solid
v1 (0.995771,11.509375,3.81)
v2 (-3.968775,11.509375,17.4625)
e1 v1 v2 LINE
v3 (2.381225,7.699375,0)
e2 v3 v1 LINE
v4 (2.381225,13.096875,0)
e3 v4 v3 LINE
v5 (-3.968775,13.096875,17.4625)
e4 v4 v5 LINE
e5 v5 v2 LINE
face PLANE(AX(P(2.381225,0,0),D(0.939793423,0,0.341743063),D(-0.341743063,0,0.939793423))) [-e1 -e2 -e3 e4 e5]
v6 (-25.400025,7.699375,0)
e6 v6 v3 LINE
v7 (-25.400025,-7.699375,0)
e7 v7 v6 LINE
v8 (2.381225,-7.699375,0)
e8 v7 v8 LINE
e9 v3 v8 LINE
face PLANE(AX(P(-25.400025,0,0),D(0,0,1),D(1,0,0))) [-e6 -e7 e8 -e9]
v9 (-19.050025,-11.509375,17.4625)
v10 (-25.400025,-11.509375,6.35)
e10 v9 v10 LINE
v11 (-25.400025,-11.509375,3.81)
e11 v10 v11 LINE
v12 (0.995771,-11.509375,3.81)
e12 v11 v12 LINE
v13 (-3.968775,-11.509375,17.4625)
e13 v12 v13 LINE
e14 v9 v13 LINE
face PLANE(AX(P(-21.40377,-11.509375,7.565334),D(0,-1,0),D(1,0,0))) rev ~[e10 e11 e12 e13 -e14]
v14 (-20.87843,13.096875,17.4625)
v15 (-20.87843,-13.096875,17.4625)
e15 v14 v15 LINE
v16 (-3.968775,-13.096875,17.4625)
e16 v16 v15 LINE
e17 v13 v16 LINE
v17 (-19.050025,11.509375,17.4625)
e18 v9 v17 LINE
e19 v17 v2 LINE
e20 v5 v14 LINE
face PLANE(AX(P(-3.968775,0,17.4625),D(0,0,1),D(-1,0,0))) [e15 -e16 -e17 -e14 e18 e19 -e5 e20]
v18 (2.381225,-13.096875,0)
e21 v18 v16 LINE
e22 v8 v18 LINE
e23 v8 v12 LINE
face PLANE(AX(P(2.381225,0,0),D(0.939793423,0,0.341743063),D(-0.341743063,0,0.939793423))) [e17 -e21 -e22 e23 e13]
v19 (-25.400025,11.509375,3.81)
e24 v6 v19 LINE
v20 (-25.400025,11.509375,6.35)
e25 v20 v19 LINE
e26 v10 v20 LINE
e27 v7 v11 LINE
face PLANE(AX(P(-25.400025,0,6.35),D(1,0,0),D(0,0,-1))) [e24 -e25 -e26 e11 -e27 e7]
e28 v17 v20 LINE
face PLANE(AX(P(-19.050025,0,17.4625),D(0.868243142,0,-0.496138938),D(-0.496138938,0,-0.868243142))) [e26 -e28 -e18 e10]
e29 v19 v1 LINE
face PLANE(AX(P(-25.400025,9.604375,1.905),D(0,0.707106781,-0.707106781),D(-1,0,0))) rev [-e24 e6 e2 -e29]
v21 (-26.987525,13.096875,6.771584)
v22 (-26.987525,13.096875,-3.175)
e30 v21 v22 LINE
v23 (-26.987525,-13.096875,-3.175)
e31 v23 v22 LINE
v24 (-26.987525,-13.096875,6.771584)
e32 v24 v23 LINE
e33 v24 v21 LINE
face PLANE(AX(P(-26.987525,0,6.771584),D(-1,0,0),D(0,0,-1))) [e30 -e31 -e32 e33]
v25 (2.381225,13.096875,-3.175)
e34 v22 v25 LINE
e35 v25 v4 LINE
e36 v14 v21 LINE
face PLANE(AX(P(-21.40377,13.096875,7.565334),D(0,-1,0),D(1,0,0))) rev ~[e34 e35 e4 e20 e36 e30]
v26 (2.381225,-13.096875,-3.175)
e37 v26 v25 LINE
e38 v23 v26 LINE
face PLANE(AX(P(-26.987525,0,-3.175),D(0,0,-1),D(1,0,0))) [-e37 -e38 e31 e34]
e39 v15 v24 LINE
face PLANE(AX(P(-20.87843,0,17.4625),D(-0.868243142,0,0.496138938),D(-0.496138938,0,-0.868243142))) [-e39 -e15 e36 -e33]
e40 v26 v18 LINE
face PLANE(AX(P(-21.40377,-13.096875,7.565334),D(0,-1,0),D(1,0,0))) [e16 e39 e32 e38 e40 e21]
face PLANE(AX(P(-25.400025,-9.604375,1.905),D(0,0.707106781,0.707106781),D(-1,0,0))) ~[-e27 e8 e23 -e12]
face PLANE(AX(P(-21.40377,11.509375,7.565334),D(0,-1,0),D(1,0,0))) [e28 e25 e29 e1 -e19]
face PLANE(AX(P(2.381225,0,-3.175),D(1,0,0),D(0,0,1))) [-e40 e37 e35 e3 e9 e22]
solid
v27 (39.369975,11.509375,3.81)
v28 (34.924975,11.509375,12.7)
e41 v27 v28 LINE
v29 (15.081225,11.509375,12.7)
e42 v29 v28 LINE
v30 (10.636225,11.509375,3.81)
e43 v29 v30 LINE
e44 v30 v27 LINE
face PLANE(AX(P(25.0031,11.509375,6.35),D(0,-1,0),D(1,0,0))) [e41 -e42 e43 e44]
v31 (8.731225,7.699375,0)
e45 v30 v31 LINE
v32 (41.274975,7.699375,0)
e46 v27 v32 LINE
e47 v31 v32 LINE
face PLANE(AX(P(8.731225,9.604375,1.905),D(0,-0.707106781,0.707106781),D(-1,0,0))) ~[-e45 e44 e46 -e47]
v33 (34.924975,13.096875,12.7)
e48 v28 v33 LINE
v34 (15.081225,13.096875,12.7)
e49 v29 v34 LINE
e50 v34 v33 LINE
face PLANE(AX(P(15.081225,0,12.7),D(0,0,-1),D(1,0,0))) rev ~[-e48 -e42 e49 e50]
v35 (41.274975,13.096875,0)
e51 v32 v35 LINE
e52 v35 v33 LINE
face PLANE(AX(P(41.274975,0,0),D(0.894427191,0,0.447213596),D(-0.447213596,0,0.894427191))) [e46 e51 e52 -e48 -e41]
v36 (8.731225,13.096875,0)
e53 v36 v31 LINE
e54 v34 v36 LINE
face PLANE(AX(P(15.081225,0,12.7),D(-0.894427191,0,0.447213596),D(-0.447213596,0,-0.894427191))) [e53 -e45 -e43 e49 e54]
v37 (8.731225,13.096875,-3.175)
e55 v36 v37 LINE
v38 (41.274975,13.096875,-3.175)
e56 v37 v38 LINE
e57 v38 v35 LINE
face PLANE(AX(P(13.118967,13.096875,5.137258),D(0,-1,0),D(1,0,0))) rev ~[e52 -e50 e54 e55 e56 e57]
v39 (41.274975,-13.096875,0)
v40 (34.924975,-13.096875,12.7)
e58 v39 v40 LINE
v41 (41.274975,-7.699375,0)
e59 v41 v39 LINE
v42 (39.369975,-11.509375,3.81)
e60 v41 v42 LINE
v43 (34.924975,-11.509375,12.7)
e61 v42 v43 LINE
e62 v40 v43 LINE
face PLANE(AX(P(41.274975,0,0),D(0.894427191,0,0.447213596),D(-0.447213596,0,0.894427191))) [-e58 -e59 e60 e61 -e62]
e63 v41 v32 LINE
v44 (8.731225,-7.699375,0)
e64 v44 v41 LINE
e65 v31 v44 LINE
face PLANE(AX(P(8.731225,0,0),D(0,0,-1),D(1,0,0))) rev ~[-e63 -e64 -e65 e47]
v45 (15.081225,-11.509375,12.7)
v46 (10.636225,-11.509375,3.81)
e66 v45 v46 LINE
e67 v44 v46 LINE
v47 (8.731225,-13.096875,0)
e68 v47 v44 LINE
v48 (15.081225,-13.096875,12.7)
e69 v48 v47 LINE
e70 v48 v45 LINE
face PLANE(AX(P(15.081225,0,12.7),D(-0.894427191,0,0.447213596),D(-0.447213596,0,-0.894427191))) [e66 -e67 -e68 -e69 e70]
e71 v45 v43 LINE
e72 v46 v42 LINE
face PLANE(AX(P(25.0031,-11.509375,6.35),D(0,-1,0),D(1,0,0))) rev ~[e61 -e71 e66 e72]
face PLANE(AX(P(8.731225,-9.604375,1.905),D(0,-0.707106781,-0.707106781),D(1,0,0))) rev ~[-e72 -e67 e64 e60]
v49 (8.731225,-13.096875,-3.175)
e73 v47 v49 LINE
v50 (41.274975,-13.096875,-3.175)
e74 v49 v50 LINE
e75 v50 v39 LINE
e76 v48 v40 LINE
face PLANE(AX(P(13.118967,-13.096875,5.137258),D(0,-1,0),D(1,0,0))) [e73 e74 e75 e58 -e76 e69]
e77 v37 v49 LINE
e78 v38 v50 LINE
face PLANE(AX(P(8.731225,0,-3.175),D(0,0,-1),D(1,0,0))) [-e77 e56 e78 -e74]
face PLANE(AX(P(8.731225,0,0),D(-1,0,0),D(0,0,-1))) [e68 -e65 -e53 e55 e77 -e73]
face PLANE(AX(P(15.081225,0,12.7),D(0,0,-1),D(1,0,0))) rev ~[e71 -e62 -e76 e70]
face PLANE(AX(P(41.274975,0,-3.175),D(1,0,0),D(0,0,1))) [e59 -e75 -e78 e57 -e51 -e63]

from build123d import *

# Parameters (mm, degrees)
F0_W      = 15.08125
F0_H      = 17.4625
F1_DEPTH  = 13.096875
F0_W_2    = 19.84375
F0_H_2    = 12.7
F2_DEPTH  = 11.509375
F3_SIZE   = 3.81
F3_2_SIZE = 3.81


# Not quite as in the source:
# - a feature names something its author has since deleted; it is built from what else it names


with BuildPart() as f1:
    # F0 (on Front) → F1 (new body, symmetric)
    with BuildSketch(Plane.XZ):
        Polygon((-25.4000246501, 0), (-19.0500246501, 0), (-19.0500246501, 17.4625), (-25.4000246501, 6.35), align=None)
        Polygon((-3.9687746501, 0), (2.3812253499, 0), (-3.9687746501, 17.4625), align=None)
        Polygon((-26.9875246501, -3.175), (-25.4000246501, -3.175), (-25.4000246501, 0), (-25.4000246501, 6.35), (-19.0500246501, 17.4625), (-20.8784295323, 17.4625), (-26.9875246501, 6.7715835439), (-26.9875246501, 6.35), align=None)
        with Locations((-11.5093996501, 8.73125)):
            Rectangle(F0_W, F0_H)
        Polygon((2.3812253499, -3.175), (2.3812253499, 0), (-3.9687746501, 0), (-19.0500246501, 0), (-25.4000246501, 0), (-25.4000246501, -3.175), align=None)
    extrude(amount=F1_DEPTH, both=True)


with BuildPart() as f1b:
    # F0 (on Front) → F1, piece 2 (new body, symmetric)
    with BuildSketch(Plane.XZ):
        Polygon((8.7312253499, 0), (15.0812253499, 0), (15.0812253499, 12.7), align=None)
        Polygon((34.9249753499, 0), (41.2749753499, 0), (34.9249753499, 12.7), align=None)
        Polygon((41.2749753499, -3.175), (41.2749753499, 0), (34.9249753499, 0), (15.0812253499, 0), (8.7312253499, 0), (8.7312253499, -3.175), align=None)
        with Locations((25.0031003499, 6.35)):
            Rectangle(F0_W_2, F0_H_2)
    extrude(amount=F1_DEPTH, both=True)


with BuildPart() as f2_tool:
    # F0 (on Front) → F2 (new body, symmetric)
    with BuildSketch(Plane.XZ):
        Polygon((-25.4000246501, 0), (-19.0500246501, 0), (-19.0500246501, 17.4625), (-25.4000246501, 6.35), align=None)
        with Locations((-11.5093996501, 8.73125)):
            Rectangle(F0_W, F0_H)
        Polygon((-3.9687746501, 0), (2.3812253499, 0), (-3.9687746501, 17.4625), align=None)
        with Locations((25.0031003499, 6.35)):
            Rectangle(F0_W_2, F0_H_2)
        Polygon((8.7312253499, 0), (15.0812253499, 0), (15.0812253499, 12.7), align=None)
        Polygon((34.9249753499, 0), (41.2749753499, 0), (34.9249753499, 12.7), align=None)
    extrude(amount=F2_DEPTH, both=True)


with BuildPart() as f1_1:
    add(f1.part)

    # F2: cut by f2_tool
    add(f2_tool.part, mode=Mode.SUBTRACT)

    # F3
    f3_edges = [f1_1.edges().sort_by_distance(p)[0] for p in [
        (-11.5094, -11.509375, 0),
        (-11.5094, 11.509375, 0),
    ]]
    chamfer(f3_edges, length=F3_SIZE)


with BuildPart() as f1b_1:
    add(f1b.part)

    # F2: cut by f2_tool
    add(f2_tool.part, mode=Mode.SUBTRACT)

    # F3#2
    f3_2_edges = [f1b_1.edges().sort_by_distance(p)[0] for p in [
        (25.0031, 11.509375, 0),
        (25.0031, -11.509375, 0),
    ]]
    chamfer(f3_2_edges, length=F3_2_SIZE)


solid = Compound([f1_1.part, f1b_1.part])
